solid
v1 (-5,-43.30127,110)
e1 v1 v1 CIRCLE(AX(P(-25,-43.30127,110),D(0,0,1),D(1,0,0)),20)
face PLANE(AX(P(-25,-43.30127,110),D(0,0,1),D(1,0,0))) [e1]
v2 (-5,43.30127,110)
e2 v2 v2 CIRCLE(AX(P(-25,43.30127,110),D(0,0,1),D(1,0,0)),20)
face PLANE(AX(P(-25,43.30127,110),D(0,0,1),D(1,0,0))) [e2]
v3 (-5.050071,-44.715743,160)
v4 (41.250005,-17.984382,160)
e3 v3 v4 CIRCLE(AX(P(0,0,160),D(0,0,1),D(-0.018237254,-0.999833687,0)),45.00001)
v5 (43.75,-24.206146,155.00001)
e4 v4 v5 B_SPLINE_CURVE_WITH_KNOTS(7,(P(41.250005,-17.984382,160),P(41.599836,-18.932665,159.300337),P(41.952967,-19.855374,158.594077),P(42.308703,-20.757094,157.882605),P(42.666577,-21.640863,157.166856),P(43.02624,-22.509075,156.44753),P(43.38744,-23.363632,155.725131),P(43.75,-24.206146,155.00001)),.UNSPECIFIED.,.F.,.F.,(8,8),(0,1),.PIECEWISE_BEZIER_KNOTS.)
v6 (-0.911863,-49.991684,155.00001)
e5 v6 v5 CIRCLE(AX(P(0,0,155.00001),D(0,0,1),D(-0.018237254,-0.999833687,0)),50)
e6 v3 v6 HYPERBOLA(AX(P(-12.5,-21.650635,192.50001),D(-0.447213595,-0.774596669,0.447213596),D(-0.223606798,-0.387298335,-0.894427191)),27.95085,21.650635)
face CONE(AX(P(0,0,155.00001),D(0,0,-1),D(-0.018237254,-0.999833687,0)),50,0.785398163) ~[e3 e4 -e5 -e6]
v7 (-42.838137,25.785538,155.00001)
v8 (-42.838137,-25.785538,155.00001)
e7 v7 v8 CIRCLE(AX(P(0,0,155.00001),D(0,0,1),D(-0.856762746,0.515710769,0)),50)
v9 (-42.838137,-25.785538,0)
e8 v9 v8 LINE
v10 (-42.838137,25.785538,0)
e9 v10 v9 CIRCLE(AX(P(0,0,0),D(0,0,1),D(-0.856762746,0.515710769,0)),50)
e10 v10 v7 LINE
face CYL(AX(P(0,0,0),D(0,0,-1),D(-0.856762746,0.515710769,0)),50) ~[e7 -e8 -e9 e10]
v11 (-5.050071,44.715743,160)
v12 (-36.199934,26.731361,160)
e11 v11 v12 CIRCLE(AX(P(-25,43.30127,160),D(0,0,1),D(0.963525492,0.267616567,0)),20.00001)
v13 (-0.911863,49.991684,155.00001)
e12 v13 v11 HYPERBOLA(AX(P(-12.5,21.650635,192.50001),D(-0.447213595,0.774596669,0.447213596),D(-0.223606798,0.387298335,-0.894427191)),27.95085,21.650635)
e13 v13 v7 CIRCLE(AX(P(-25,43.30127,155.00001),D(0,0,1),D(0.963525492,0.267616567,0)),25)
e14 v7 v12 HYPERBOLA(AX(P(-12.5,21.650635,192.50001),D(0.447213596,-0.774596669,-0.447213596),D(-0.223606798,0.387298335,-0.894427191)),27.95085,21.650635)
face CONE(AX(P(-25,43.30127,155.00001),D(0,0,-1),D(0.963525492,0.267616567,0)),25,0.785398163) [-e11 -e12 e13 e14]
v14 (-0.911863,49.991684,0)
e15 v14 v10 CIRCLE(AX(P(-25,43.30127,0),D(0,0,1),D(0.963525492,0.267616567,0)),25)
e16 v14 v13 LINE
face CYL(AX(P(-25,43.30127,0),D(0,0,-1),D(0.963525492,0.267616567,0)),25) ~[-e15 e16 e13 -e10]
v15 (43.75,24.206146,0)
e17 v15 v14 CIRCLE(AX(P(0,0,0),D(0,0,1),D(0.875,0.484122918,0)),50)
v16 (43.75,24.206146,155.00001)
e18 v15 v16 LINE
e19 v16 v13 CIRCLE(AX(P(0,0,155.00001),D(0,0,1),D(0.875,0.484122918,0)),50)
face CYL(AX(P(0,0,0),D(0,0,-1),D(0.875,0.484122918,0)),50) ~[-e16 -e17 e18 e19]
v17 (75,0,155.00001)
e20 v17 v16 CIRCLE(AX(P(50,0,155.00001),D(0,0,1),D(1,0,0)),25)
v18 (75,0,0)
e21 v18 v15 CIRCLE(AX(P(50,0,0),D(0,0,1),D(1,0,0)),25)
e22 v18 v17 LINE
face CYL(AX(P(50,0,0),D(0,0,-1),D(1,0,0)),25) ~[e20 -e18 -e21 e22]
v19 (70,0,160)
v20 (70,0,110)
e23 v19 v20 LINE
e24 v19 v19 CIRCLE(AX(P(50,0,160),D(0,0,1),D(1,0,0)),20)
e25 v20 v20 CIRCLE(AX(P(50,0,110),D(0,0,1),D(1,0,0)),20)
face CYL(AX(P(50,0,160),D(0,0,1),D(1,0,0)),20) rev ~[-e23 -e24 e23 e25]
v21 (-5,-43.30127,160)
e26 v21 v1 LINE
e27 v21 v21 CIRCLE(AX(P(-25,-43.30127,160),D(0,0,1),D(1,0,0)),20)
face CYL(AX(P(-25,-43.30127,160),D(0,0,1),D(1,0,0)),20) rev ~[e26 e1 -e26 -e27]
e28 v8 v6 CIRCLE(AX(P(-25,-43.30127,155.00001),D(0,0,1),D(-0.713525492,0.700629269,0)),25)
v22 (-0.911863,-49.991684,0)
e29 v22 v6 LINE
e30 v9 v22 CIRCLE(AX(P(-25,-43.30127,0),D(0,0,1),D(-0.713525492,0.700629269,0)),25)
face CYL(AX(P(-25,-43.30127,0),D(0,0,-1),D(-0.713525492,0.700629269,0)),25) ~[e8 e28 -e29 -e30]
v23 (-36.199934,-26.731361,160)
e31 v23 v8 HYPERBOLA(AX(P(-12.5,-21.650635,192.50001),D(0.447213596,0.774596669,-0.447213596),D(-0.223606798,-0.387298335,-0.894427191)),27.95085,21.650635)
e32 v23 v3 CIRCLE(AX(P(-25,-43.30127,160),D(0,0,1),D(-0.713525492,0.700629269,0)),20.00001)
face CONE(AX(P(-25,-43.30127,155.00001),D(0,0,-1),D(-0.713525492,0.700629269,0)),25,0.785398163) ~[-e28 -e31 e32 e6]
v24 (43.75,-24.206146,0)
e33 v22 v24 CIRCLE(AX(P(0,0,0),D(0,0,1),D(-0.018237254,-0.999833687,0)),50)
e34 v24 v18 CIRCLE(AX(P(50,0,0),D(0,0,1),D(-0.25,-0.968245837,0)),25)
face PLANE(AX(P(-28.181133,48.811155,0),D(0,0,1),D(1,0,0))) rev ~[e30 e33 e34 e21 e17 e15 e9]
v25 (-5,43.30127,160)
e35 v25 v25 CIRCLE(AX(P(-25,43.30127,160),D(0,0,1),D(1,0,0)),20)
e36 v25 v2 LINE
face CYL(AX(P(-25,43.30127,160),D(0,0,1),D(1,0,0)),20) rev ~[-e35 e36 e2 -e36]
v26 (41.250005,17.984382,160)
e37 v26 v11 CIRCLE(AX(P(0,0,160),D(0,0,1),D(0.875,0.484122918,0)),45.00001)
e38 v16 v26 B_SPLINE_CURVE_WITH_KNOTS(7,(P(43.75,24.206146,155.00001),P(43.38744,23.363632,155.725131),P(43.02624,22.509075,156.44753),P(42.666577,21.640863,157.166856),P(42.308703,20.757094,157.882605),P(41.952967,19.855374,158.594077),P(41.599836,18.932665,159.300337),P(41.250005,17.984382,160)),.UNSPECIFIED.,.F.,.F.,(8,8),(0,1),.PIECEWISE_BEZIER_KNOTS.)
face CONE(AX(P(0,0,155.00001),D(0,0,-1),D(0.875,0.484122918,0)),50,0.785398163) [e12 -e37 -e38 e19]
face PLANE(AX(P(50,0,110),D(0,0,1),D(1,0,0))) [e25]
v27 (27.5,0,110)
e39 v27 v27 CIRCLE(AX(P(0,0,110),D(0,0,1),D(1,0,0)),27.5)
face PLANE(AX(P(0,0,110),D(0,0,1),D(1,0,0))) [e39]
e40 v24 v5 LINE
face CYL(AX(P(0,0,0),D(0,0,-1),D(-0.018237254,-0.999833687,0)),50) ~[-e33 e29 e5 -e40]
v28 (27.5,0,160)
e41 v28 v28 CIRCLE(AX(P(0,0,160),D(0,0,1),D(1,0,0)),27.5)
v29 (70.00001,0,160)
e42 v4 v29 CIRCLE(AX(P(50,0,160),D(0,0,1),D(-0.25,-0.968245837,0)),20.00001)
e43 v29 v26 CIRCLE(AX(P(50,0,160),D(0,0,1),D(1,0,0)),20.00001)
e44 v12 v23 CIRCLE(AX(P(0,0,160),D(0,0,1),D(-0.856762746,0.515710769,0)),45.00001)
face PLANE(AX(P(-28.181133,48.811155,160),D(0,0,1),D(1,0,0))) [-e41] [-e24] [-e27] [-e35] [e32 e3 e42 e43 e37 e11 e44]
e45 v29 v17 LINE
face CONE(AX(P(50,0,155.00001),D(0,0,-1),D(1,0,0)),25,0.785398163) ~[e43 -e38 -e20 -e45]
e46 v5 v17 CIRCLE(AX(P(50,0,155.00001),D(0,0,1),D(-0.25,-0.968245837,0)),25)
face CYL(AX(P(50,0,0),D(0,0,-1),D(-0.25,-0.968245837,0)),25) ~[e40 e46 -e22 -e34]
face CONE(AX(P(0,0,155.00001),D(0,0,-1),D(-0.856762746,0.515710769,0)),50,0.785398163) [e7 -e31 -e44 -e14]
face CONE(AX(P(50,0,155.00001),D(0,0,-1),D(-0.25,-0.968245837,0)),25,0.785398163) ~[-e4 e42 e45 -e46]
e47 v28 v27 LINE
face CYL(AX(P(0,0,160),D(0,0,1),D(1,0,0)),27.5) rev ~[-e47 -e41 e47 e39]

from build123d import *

# Parameters (mm, degrees)
F1_DEPTH = 160
F2_DEPTH = 160
F3_R     = 20
F3_R_2   = 27.5
F4_DEPTH = 50
F5_SIZE  = 4.99999


# Not quite as in the source:
# - a fillet or chamfer is up to 0.001 mm smaller than in the source, because OpenCascade refuses the exact size


with BuildPart() as f1:
    # F0 (on Top) → F1 (new body)
    with BuildSketch(Plane.XY):
        with BuildLine():
            ThreePointArc((43.75, 24.2061459138), (48.4122918276, 12.5), (50, 0))
            ThreePointArc((50, 0), (48.4122918276, -12.5), (43.75, -24.2061459138))
            ThreePointArc((43.75, -24.2061459138), (65.3093108924, -19.7642353761), (75, 0))
            ThreePointArc((75, 0), (65.3093108924, 19.7642353761), (43.75, 24.2061459138))
        make_face()
        with BuildLine():
            ThreePointArc((43.75, -24.2061459138), (48.4122918276, -12.5), (50, 0))
            ThreePointArc((50, 0), (48.4122918276, 12.5), (43.75, 24.2061459138))
            ThreePointArc((43.75, 24.2061459138), (25, 0), (43.75, -24.2061459138))
        make_face()
        with BuildLine():
            ThreePointArc((43.75, -24.2061459138), (25, 0), (43.75, 24.2061459138))
            ThreePointArc((43.75, 24.2061459138), (25, 43.3012701892), (-0.9118627109, 49.9916843725))
            ThreePointArc((-0.9118627109, 49.9916843725), (-0.2290146318, 46.6774046484), (0, 43.3012701892))
            ThreePointArc((0, 43.3012701892), (-15.5383255242, 20.1609003539), (-42.8381372891, 25.7855384587))
            ThreePointArc((-42.8381372891, 25.7855384587), (-50, 0), (-42.8381372891, -25.7855384587))
            ThreePointArc((-42.8381372891, -25.7855384587), (-15.5383255242, -20.1609003539), (0, -43.3012701892))
            ThreePointArc((0, -43.3012701892), (-0.2290146318, -46.6774046484), (-0.9118627109, -49.9916843725))
            ThreePointArc((-0.9118627109, -49.9916843725), (25, -43.3012701892), (43.75, -24.2061459138))
        make_face()
    extrude(amount=F1_DEPTH)

    # F0 (on Top) → F2 (join)
    with BuildSketch(Plane.XY):
        with BuildLine():
            ThreePointArc((-42.8381372891, 25.7855384587), (-25, 43.3012701892), (-0.9118627109, 49.9916843725))
            ThreePointArc((-0.9118627109, 49.9916843725), (-37.5, 64.9519052838), (-42.8381372891, 25.7855384587))
        make_face()
        with BuildLine():
            ThreePointArc((0, 43.3012701892), (-0.2290146318, 46.6774046484), (-0.9118627109, 49.9916843725))
            ThreePointArc((-0.9118627109, 49.9916843725), (-25, 43.3012701892), (-42.8381372891, 25.7855384587))
            ThreePointArc((-42.8381372891, 25.7855384587), (-15.5383255242, 20.1609003539), (0, 43.3012701892))
        make_face()
        with BuildLine():
            ThreePointArc((43.75, -24.2061459138), (25, 0), (43.75, 24.2061459138))
            ThreePointArc((43.75, 24.2061459138), (25, 43.3012701892), (-0.9118627109, 49.9916843725))
            ThreePointArc((-0.9118627109, 49.9916843725), (-0.2290146318, 46.6774046484), (0, 43.3012701892))
            ThreePointArc((0, 43.3012701892), (-15.5383255242, 20.1609003539), (-42.8381372891, 25.7855384587))
            ThreePointArc((-42.8381372891, 25.7855384587), (-50, 0), (-42.8381372891, -25.7855384587))
            ThreePointArc((-42.8381372891, -25.7855384587), (-15.5383255242, -20.1609003539), (0, -43.3012701892))
            ThreePointArc((0, -43.3012701892), (-0.2290146318, -46.6774046484), (-0.9118627109, -49.9916843725))
            ThreePointArc((-0.9118627109, -49.9916843725), (25, -43.3012701892), (43.75, -24.2061459138))
        make_face()
        with BuildLine():
            ThreePointArc((43.75, -24.2061459138), (48.4122918276, -12.5), (50, 0))
            ThreePointArc((50, 0), (48.4122918276, 12.5), (43.75, 24.2061459138))
            ThreePointArc((43.75, 24.2061459138), (25, 0), (43.75, -24.2061459138))
        make_face()
        with BuildLine():
            ThreePointArc((43.75, 24.2061459138), (48.4122918276, 12.5), (50, 0))
            ThreePointArc((50, 0), (48.4122918276, -12.5), (43.75, -24.2061459138))
            ThreePointArc((43.75, -24.2061459138), (65.3093108924, -19.7642353761), (75, 0))
            ThreePointArc((75, 0), (65.3093108924, 19.7642353761), (43.75, 24.2061459138))
        make_face()
        with BuildLine():
            ThreePointArc((-42.8381372891, -25.7855384587), (-25, -43.3012701892), (-0.9118627109, -49.9916843725))
            ThreePointArc((-0.9118627109, -49.9916843725), (-0.2290146318, -46.6774046484), (0, -43.3012701892))
            ThreePointArc((0, -43.3012701892), (-15.5383255242, -20.1609003539), (-42.8381372891, -25.7855384587))
        make_face()
        with BuildLine():
            ThreePointArc((-42.8381372891, -25.7855384587), (-37.5, -64.9519052838), (-0.9118627109, -49.9916843725))
            ThreePointArc((-0.9118627109, -49.9916843725), (-25, -43.3012701892), (-42.8381372891, -25.7855384587))
        make_face()
    extrude(amount=F2_DEPTH)

    # F3 (on face) → F4 (cut)
    with BuildSketch(Plane.XY.offset(160)):
        with Locations((-25, 43.3012701892)):
            Circle(F3_R)
        with Locations((-25, -43.3012701892)):
            Circle(F3_R)
        with Locations((50, 0)):
            Circle(F3_R)
        Circle(F3_R_2)
    extrude(amount=-F4_DEPTH, mode=Mode.SUBTRACT)

    # F5 (size 5 in the source; OpenCascade refuses exactly that, so slightly less here)
    f5_edges = [f1.edges().sort_by_distance(p)[0] for p in [
        (25, -43.30127, 160),
        (-37.5, -64.951905, 160),
        (-50, 0, 160),
        (-37.5, 64.951905, 160),
        (25, 43.30127, 160),
        (75, 0, 160),
    ]]
    chamfer(f5_edges, length=F5_SIZE)


solid = f1.part
